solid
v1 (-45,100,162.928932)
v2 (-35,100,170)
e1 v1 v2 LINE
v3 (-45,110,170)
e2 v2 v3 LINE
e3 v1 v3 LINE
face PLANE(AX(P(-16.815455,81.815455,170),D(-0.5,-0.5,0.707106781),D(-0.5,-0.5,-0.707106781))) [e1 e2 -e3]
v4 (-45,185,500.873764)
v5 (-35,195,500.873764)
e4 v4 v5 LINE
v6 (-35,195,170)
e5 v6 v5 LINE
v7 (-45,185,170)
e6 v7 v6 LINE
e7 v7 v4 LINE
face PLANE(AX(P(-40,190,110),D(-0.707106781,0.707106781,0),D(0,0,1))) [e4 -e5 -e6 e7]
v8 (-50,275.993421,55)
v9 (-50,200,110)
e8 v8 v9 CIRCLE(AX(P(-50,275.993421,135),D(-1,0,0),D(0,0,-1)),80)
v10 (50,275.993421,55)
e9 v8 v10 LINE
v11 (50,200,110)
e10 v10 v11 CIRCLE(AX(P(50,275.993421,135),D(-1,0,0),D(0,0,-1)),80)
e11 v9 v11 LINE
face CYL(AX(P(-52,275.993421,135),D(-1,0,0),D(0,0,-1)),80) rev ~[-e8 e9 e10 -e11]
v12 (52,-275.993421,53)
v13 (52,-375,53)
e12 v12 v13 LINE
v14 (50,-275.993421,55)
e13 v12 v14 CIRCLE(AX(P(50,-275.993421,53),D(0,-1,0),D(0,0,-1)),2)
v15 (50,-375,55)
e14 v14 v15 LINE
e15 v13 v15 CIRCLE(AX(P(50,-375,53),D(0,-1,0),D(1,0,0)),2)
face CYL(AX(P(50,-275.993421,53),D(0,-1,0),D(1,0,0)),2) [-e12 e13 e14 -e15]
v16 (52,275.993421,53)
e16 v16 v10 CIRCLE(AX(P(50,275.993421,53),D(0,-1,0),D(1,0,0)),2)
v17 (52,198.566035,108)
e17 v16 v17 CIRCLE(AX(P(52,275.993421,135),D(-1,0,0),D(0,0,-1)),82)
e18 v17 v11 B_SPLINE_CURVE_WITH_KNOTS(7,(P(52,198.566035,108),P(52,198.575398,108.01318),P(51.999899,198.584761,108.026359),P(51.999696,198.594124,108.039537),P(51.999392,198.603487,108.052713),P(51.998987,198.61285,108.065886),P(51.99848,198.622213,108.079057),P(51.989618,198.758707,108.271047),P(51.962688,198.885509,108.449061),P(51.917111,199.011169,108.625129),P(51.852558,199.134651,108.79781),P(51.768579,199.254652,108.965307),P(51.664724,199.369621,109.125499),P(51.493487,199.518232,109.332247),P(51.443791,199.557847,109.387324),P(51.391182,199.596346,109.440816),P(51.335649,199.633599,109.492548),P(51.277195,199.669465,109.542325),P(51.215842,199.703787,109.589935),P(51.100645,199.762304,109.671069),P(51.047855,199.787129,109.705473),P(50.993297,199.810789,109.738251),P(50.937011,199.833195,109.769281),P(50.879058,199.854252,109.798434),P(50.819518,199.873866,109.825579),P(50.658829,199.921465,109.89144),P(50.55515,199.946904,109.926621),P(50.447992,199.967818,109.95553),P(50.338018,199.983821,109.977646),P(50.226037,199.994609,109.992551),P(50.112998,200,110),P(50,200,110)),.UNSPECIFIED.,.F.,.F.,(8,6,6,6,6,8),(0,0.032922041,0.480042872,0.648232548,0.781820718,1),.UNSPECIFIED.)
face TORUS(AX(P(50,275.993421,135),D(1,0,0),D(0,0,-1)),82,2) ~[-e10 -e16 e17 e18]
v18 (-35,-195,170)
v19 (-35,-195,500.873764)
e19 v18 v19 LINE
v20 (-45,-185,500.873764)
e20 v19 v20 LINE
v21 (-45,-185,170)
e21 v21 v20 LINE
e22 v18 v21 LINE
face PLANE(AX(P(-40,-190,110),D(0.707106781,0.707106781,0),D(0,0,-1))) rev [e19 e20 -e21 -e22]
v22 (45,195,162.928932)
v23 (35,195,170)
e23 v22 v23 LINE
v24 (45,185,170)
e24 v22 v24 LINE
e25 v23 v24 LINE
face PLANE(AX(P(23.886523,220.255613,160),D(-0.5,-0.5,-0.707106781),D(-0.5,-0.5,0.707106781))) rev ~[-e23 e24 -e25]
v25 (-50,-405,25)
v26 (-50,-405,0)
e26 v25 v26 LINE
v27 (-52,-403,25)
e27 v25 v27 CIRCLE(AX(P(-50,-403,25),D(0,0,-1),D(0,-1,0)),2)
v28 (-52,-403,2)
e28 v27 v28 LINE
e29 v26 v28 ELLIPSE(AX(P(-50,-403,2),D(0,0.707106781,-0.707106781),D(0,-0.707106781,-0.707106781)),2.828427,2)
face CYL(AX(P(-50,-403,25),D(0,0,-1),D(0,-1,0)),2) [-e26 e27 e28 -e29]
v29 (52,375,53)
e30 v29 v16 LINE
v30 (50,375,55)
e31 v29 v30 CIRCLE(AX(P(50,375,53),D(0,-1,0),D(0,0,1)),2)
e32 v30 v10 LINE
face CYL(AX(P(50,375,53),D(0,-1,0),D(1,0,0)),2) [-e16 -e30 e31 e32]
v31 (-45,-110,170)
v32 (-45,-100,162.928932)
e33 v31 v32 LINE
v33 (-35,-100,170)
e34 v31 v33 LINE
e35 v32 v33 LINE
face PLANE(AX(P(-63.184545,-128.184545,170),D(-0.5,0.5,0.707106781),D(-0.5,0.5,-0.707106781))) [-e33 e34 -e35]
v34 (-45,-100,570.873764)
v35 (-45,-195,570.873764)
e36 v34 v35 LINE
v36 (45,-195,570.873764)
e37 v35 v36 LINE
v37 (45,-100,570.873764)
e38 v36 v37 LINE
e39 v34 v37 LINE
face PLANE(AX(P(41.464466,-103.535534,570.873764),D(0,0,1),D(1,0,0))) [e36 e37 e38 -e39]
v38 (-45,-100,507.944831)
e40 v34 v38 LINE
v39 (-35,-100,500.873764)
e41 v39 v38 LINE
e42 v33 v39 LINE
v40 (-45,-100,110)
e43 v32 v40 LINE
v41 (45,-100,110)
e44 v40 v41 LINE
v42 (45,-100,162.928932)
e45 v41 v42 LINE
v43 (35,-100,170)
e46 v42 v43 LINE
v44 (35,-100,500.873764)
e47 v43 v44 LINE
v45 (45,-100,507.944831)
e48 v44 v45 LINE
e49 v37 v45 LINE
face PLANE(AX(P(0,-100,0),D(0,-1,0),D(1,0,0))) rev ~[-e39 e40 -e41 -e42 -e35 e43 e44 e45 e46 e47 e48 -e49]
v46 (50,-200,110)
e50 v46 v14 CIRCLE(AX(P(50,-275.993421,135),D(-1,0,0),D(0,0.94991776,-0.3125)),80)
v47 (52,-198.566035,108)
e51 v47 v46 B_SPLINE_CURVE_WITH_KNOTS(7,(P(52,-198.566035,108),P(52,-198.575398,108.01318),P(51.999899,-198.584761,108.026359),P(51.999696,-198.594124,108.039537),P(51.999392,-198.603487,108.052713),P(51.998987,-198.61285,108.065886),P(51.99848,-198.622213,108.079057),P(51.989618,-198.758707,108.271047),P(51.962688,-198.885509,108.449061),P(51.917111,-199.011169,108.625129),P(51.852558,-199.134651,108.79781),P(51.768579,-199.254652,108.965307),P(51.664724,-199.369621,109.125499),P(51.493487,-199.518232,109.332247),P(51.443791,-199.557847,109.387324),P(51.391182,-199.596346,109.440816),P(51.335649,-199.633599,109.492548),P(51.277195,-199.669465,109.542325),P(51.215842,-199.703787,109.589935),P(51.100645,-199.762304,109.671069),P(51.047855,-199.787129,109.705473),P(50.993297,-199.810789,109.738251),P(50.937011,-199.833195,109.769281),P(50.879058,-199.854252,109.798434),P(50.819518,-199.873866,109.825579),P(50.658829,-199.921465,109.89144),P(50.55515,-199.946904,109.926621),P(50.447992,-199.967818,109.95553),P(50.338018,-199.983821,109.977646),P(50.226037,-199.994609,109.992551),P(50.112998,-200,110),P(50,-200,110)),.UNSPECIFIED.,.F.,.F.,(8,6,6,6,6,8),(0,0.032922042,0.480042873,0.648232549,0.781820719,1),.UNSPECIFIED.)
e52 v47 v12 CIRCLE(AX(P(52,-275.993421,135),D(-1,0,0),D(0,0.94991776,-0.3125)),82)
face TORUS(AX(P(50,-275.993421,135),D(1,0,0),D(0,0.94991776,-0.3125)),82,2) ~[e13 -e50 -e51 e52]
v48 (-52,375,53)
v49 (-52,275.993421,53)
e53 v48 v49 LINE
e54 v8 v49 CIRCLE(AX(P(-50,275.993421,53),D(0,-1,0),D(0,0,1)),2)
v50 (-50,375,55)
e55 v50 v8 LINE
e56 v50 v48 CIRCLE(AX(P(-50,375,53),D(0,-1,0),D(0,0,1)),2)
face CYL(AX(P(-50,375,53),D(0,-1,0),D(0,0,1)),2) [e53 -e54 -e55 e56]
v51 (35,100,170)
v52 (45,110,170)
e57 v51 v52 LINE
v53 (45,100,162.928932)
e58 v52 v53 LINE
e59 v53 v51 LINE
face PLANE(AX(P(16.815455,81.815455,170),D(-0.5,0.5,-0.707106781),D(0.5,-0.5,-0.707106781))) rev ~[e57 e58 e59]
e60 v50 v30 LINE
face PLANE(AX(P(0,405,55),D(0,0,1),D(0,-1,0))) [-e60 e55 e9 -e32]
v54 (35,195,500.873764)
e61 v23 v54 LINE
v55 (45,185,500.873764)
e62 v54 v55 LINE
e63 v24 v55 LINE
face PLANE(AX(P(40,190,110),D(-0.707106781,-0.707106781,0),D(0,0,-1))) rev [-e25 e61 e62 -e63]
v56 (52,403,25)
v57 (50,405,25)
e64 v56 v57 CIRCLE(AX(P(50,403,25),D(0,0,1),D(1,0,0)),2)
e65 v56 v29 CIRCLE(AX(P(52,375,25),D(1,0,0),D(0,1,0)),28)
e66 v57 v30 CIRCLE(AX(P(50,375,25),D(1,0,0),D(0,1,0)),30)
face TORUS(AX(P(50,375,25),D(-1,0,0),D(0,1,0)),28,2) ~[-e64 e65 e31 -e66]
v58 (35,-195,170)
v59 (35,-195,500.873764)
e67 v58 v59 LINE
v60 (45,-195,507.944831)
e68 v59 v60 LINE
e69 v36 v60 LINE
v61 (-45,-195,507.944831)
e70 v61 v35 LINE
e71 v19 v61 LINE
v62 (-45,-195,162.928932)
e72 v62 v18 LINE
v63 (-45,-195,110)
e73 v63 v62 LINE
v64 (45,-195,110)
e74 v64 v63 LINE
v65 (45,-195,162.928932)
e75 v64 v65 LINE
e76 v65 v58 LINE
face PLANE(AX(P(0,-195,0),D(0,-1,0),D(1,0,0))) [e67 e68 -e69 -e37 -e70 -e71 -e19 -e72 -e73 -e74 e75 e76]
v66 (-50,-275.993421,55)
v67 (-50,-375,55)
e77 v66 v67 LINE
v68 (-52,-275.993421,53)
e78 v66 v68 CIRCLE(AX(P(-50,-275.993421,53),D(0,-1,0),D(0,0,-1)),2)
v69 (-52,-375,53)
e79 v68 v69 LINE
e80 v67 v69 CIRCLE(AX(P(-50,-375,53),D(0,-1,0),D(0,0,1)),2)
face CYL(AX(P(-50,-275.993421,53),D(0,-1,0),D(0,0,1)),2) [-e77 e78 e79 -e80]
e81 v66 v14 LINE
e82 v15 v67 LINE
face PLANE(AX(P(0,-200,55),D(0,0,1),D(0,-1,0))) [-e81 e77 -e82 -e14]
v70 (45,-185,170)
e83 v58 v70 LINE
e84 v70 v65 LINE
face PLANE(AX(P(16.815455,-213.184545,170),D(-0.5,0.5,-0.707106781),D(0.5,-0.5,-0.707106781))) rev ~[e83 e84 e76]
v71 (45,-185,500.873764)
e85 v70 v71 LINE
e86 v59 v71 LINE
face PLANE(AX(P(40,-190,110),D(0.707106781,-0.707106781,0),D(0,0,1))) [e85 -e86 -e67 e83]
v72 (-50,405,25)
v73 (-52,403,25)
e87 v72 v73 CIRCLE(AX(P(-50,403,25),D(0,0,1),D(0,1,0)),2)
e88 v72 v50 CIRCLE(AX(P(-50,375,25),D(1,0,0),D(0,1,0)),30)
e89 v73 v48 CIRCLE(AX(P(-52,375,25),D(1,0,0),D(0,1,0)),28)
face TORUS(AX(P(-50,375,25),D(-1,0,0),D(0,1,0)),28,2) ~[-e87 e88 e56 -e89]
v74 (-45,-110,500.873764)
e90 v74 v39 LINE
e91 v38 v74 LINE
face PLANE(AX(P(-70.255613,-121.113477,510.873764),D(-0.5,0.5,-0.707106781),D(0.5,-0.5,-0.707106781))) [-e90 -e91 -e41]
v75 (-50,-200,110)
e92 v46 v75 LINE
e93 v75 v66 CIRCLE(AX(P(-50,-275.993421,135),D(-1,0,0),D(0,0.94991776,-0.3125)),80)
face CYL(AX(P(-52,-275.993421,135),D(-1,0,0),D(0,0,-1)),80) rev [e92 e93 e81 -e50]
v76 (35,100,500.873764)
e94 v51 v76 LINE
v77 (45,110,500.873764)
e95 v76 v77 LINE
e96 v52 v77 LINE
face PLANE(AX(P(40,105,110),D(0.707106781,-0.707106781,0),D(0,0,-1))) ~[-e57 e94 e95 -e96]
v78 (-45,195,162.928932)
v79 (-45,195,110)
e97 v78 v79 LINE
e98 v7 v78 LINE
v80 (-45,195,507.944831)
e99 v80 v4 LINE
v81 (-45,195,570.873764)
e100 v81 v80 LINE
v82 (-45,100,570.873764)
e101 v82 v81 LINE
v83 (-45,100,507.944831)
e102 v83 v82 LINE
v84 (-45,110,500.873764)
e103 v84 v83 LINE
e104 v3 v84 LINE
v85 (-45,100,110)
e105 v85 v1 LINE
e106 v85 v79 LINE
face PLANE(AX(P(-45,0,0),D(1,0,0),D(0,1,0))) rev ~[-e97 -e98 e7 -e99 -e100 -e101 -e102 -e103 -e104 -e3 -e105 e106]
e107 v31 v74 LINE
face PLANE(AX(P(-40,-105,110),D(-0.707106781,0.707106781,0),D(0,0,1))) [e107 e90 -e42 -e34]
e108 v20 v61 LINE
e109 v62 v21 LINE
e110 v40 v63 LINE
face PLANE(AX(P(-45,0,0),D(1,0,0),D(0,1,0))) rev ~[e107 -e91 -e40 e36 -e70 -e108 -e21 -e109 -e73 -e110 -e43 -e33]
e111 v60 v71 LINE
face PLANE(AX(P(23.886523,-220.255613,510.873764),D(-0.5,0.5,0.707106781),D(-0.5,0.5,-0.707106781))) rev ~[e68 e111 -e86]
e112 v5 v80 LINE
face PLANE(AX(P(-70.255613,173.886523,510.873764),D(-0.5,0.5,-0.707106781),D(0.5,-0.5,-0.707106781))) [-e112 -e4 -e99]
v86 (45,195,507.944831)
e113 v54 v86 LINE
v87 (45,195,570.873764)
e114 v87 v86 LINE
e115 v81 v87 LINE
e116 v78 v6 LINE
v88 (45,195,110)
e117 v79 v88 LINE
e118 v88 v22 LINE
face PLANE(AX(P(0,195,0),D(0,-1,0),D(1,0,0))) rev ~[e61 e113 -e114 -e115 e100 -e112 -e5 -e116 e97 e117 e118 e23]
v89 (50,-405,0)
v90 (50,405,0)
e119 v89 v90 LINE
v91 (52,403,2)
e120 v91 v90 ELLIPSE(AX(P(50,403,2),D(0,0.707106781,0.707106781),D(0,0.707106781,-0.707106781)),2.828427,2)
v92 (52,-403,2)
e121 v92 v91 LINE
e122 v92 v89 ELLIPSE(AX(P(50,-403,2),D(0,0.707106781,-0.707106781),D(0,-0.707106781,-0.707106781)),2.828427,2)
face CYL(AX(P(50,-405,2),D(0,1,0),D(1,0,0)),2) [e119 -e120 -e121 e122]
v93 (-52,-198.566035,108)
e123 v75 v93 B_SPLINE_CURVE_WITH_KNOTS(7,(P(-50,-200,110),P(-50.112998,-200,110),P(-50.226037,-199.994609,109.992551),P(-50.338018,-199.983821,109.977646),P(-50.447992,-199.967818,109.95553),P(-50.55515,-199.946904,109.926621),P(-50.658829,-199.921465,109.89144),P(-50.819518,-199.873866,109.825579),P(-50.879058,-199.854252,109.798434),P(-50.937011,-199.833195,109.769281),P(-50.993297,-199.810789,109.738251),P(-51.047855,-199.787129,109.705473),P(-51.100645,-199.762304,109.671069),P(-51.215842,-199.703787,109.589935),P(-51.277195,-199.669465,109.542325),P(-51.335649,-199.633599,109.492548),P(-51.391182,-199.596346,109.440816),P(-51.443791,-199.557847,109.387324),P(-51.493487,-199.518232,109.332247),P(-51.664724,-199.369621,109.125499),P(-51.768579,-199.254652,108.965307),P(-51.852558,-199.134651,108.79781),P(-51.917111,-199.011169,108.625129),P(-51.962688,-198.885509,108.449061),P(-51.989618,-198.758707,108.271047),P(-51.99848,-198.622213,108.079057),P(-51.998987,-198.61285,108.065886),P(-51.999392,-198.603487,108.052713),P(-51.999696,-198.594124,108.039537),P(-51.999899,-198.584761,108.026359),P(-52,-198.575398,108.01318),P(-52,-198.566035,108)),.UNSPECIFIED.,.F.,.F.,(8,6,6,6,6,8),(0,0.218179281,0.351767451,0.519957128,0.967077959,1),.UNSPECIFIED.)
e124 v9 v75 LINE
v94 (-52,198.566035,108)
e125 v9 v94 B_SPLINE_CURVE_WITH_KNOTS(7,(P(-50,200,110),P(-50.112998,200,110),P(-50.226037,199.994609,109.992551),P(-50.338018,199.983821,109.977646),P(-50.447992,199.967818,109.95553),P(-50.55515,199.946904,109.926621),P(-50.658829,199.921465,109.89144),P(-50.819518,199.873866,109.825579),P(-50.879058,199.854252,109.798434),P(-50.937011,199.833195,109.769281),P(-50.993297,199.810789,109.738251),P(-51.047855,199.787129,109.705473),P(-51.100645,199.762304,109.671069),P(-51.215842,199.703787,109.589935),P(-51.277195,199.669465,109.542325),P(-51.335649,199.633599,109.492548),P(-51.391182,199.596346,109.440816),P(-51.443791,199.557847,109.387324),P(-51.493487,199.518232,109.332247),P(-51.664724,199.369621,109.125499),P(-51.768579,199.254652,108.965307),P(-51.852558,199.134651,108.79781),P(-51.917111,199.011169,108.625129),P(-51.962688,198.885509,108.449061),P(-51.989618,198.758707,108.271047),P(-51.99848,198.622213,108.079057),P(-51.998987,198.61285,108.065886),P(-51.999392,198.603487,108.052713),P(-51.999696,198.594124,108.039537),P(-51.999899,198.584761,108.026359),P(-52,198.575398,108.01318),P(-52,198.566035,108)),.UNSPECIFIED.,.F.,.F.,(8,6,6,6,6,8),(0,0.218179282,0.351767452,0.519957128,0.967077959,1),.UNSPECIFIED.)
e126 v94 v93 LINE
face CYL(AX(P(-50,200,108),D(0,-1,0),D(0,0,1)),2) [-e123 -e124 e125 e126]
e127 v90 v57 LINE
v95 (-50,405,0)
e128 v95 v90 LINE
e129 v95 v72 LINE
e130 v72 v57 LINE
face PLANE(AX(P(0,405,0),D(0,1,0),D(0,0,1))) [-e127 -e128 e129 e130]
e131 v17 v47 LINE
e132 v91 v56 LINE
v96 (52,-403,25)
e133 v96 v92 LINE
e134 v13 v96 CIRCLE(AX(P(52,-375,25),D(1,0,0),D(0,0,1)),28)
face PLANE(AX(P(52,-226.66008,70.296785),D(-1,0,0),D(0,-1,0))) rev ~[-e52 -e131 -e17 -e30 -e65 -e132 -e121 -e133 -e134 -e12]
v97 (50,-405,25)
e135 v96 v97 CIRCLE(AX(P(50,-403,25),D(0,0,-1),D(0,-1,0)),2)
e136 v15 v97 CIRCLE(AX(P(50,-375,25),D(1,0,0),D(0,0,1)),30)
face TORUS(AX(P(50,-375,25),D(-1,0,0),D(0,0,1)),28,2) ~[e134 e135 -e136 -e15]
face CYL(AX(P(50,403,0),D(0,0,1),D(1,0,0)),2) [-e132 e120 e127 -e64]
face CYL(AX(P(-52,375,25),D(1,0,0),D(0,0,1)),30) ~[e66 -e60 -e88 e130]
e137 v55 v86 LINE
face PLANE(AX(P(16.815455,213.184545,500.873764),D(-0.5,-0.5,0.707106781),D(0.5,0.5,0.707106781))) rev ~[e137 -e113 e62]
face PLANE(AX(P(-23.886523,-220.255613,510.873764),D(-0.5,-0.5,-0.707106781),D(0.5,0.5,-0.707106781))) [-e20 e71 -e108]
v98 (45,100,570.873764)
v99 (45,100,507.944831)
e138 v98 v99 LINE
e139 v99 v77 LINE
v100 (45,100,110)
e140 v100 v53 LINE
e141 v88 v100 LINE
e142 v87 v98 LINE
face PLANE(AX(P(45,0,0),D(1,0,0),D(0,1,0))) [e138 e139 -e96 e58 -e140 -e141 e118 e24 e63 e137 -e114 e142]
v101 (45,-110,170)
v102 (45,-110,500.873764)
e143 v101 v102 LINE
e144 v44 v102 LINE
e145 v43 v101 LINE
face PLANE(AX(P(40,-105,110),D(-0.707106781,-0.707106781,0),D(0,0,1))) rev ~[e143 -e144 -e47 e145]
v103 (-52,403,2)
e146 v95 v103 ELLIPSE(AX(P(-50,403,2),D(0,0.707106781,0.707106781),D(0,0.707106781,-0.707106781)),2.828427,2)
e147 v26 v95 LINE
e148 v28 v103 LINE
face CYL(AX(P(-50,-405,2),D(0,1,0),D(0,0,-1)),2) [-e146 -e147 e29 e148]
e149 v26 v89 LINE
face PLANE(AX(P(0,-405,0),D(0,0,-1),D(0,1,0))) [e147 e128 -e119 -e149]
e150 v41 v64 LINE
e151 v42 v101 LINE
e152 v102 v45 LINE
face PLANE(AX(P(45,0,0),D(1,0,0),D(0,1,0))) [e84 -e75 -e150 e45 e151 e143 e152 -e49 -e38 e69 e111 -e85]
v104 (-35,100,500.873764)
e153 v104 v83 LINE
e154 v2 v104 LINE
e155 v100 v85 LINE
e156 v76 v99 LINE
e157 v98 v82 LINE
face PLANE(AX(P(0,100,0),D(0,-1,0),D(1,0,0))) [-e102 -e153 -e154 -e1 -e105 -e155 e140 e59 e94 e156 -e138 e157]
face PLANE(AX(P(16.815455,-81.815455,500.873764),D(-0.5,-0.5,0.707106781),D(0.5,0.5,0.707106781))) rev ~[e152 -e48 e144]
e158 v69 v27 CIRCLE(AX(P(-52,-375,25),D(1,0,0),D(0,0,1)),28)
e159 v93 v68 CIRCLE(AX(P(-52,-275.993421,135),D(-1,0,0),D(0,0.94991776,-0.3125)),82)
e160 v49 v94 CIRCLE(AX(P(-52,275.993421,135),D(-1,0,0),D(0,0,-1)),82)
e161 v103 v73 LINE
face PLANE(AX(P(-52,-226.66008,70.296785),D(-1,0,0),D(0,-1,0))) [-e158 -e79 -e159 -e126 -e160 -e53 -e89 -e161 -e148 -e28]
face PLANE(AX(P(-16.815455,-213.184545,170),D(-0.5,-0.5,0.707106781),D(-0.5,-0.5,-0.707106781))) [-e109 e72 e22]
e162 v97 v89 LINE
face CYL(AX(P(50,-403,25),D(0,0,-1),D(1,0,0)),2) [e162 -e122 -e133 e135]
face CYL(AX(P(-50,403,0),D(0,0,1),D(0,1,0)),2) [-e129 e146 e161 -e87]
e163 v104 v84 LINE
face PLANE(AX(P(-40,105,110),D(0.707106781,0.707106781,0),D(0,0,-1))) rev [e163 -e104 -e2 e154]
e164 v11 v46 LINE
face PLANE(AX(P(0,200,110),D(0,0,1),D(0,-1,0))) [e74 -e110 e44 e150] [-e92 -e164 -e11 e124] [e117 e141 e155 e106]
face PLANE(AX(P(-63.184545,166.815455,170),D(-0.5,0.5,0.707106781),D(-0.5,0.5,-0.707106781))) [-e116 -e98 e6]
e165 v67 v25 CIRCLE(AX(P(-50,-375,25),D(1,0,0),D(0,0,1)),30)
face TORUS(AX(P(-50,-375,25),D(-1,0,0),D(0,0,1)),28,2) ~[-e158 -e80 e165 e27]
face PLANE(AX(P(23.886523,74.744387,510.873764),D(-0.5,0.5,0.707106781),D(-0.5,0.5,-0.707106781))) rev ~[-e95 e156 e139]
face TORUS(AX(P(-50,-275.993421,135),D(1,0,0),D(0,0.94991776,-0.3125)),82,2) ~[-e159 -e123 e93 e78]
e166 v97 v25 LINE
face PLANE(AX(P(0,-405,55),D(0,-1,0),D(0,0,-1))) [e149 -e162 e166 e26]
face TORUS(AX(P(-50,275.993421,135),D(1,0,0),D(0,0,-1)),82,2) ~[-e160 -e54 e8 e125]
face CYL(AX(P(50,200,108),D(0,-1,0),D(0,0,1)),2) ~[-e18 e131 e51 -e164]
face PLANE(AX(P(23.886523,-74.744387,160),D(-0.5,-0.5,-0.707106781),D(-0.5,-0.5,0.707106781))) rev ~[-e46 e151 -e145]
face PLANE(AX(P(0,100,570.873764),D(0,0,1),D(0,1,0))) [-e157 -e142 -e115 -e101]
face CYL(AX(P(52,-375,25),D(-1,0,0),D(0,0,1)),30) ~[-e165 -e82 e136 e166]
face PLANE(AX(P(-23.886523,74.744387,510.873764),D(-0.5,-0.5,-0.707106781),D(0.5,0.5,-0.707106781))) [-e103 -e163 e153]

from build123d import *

# Parameters (mm, degrees)
F1_DEPTH      = 52
F1_DEPTH_BACK = 52
F0_W          = 95
F0_H          = 460.873763546
F2_DEPTH      = 45
F2_DEPTH_BACK = 45
F3_R          = 30
F4_T1_DEPTH   = 104
F5_T1_DEPTH   = 104
F6_SIZE       = 10
F7_W          = 90
F7_H          = 95
F8_DEPTH      = 50
F9_W          = 90
F9_H          = 95
F10_DEPTH     = 60
F11_T4_DEPTH  = 65.575795383
F11_T10_DEPTH = 65.575795383
F11_T16_DEPTH = 65.575795383
F11_T22_DEPTH = 65.575795383
F11_T28_DEPTH = 65.575795383
F11_T34_DEPTH = 65.575795383
F11_T40_DEPTH = 65.575795383
F11_T46_DEPTH = 65.575795383
F12_T4_DEPTH  = 65.575795383
F12_T10_DEPTH = 65.575795383
F12_T16_DEPTH = 65.575795383
F12_T22_DEPTH = 65.575795383
F12_T28_DEPTH = 65.575795383
F12_T34_DEPTH = 65.575795383
F12_T40_DEPTH = 65.575795383
F12_T46_DEPTH = 65.575795383
F13_R         = 2


# Not quite as in the source:
# - a fillet or chamfer that OpenCascade refuses, or shapes differently, is made with other operations: its cross-section is extruded or revolved along the edge and cut away or added


with BuildPart() as f1:
    # F0 (on Right) → F1 (new body, two sides)
    with BuildSketch(Plane.YZ) as f1_sk:
        Polygon((-405, 55), (-405, 0), (405, 0), (405, 55), (200, 55), (200, 110), (195, 110), (100, 110), (0, 110), (-100, 110), (-195, 110), (-200, 110), (-200, 55), align=None)
    extrude(amount=F1_DEPTH)
    extrude(f1_sk.sketch, amount=-F1_DEPTH_BACK)

    # F0 (on Right) → F2 (join, two sides)
    with BuildSketch(Plane.YZ) as f2_sk:
        with Locations((-147.5, 340.436881773)):
            Rectangle(F0_W, F0_H)
        with Locations((147.5, 340.436881773)):
            Rectangle(F0_W, F0_H)
    extrude(amount=-F2_DEPTH)
    extrude(f2_sk.sketch, amount=F2_DEPTH_BACK)

    # F3
    f3_edges = [f1.edges().sort_by_distance(p)[0] for p in [
        (0, 405, 55),
        (0, -405, 55),
    ]]
    fillet(f3_edges, radius=F3_R)

    # F4: fillet of radius 80 on 1 edges, made by hand

    # F4_s2 → F4_t1 (join)
    with BuildSketch(Plane.YZ.offset(-52)):
        with BuildLine():
            ThreePointArc((275.9934207679, 55), (229.0892631696, 70.1925930159), (200, 110))
            Line((200, 110), (200, 55))
            Line((200, 55), (275.9934207679, 55))
        make_face()
    extrude(amount=F4_T1_DEPTH)

    # F5: fillet of radius 80 on 1 edges, made by hand

    # F5_s2 → F5_t1 (join)
    with BuildSketch(Plane.YZ.offset(-52)):
        with BuildLine():
            ThreePointArc((-275.9934207679, 55), (-229.0892631696, 70.1925930159), (-200, 110))
            Line((-200, 110), (-200, 55))
            Line((-200, 55), (-275.9934207679, 55))
        make_face()
    extrude(amount=F5_T1_DEPTH)

    # F6
    f6_edges = [f1.edges().sort_by_distance(p)[0] for p in [
        (45, -195, 340.436882),
        (45, -100, 340.436882),
        (45, 100, 340.436882),
        (-45, -195, 340.436882),
        (-45, -100, 340.436882),
        (-45, 100, 340.436882),
        (-45, 195, 340.436882),
        (45, 195, 340.436882),
    ]]
    chamfer(f6_edges, length=F6_SIZE)

    # F7 (on face) → F8 (join)
    with BuildSketch(Plane.XY.offset(110)):
        with Locations((0, -147.5)):
            Rectangle(F7_W, F7_H)
        with Locations((0, 147.5)):
            Rectangle(F7_W, F7_H)
    extrude(amount=F8_DEPTH)

    # F9 (on face) → F10 (join)
    with BuildSketch(Plane.XY.offset(570.873763546)):
        Polygon((45, -110), (45, -100), (35, -100), align=None)
        Polygon((-45, -110), (-35, -100), (-45, -100), align=None)
        Polygon((45, -195), (45, -185), (35, -195), align=None)
        Polygon((-35, -195), (-45, -185), (-45, -195), align=None)
        with Locations((0, 147.5)):
            Rectangle(F9_W, F9_H)
        Polygon((45, -110), (35, -100), (-35, -100), (-45, -110), (-45, -185), (-35, -195), (35, -195), (45, -185), align=None)
    extrude(amount=-F10_DEPTH)

    # F11: chamfer of 10 on 8 edges, made by hand


with BuildPart() as f11_tool2:
    # F11_s3 → F11_t4 (new body)
    with BuildSketch(Plane(origin=(-98.1845447985, -98.1845447985, 0), x_dir=(0, 0, 1), z_dir=(0.7071067812, 0.7071067812, 0))):
        Polygon((510.873763546, 172.6345596729), (500.873763546, 162.6345596729), (510.873763546, 162.6345596729), align=None)
    extrude(amount=F11_T4_DEPTH)

    split(bisect_by=Plane.YZ.offset(45), keep=Keep.BOTTOM)

    split(bisect_by=Plane.XZ.offset(195), keep=Keep.BOTTOM)


with BuildPart() as f1_1:
    add(f1.part)

    # F11_t1: union F11_tool2
    add(f11_tool2.part)


with BuildPart() as f11_tool8:
    # F11_s9 → F11_t10 (new body)
    with BuildSketch(Plane(origin=(49.3154552015, -49.3154552015, 0), x_dir=(0, 0, 1), z_dir=(0.7071067812, -0.7071067812, 0))):
        Polygon((500.873763546, 45.9619407771), (510.873763546, 35.9619407771), (510.873763546, 45.9619407771), align=None)
    extrude(amount=F11_T10_DEPTH)

    split(bisect_by=Plane.YZ.offset(45), keep=Keep.BOTTOM)

    split(bisect_by=Plane.XZ.offset(100), keep=Keep.TOP)


with BuildPart() as f1_2:
    add(f1_1.part)

    # F11_t7: union F11_tool8
    add(f11_tool8.part)


with BuildPart() as f11_tool14:
    # F11_s15 → F11_t16 (new body)
    with BuildSketch(Plane(origin=(-95.6845447985, -95.6845447985, 0), x_dir=(0, 0, 1), z_dir=(0.7071067812, 0.7071067812, 0))):
        Polygon((510.873763546, 35.9619407771), (500.873763546, 45.9619407771), (510.873763546, 45.9619407771), align=None)
    extrude(amount=F11_T16_DEPTH)

    split(bisect_by=Plane.YZ.offset(-45), keep=Keep.TOP)

    split(bisect_by=Plane.XZ.offset(100), keep=Keep.TOP)


with BuildPart() as f1_3:
    add(f1_2.part)

    # F11_t13: union F11_tool14
    add(f11_tool14.part)


with BuildPart() as f11_tool20:
    # F11_s21 → F11_t22 (new body)
    with BuildSketch(Plane(origin=(98.1845447985, -98.1845447985, 0), x_dir=(0, 0, 1), z_dir=(-0.7071067812, 0.7071067812, 0))):
        Polygon((510.873763546, -172.6345596729), (500.873763546, -162.6345596729), (510.873763546, -162.6345596729), align=None)
    extrude(amount=F11_T22_DEPTH)

    split(bisect_by=Plane.XZ.offset(195), keep=Keep.BOTTOM)

    split(bisect_by=Plane.YZ.offset(-45), keep=Keep.TOP)


with BuildPart() as f1_4:
    add(f1_3.part)

    # F11_t19: union F11_tool20
    add(f11_tool20.part)


with BuildPart() as f11_tool26:
    # F11_s27 → F11_t28 (new body)
    with BuildSketch(Plane(origin=(-98.1845447985, 98.1845447985, 0), x_dir=(0, 0, 1), z_dir=(0.7071067812, -0.7071067812, 0))):
        Polygon((500.873763546, -162.6345596729), (510.873763546, -172.6345596729), (510.873763546, -162.6345596729), align=None)
    extrude(amount=F11_T28_DEPTH)

    split(bisect_by=Plane.YZ.offset(45), keep=Keep.BOTTOM)

    split(bisect_by=Plane.XZ.offset(-195), keep=Keep.TOP)


with BuildPart() as f1_5:
    add(f1_4.part)

    # F11_t25: union F11_tool26
    add(f11_tool26.part)


with BuildPart() as f11_tool32:
    # F11_s33 → F11_t34 (new body)
    with BuildSketch(Plane(origin=(49.3154552015, 49.3154552015, 0), x_dir=(0, 0, 1), z_dir=(0.7071067812, 0.7071067812, 0))):
        Polygon((510.873763546, -35.9619407771), (500.873763546, -45.9619407771), (510.873763546, -45.9619407771), align=None)
    extrude(amount=F11_T34_DEPTH)

    split(bisect_by=Plane.YZ.offset(45), keep=Keep.BOTTOM)

    split(bisect_by=Plane.XZ.offset(-100), keep=Keep.BOTTOM)


with BuildPart() as f1_6:
    add(f1_5.part)

    # F11_t31: union F11_tool32
    add(f11_tool32.part)


with BuildPart() as f11_tool38:
    # F11_s39 → F11_t40 (new body)
    with BuildSketch(Plane(origin=(-49.3154552015, 49.3154552015, 0), x_dir=(0, 0, 1), z_dir=(-0.7071067812, 0.7071067812, 0))):
        Polygon((510.873763546, 35.9619407771), (500.873763546, 45.9619407771), (510.873763546, 45.9619407771), align=None)
    extrude(amount=F11_T40_DEPTH)

    split(bisect_by=Plane.XZ.offset(-100), keep=Keep.BOTTOM)

    split(bisect_by=Plane.YZ.offset(-45), keep=Keep.TOP)


with BuildPart() as f1_7:
    add(f1_6.part)

    # F11_t37: union F11_tool38
    add(f11_tool38.part)


with BuildPart() as f11_tool44:
    # F11_s45 → F11_t46 (new body)
    with BuildSketch(Plane(origin=(51.8154552015, 51.8154552015, 0), x_dir=(0, 0, 1), z_dir=(0.7071067812, 0.7071067812, 0))):
        Polygon((510.873763546, -172.6345596729), (500.873763546, -162.6345596729), (510.873763546, -162.6345596729), align=None)
    extrude(amount=F11_T46_DEPTH)

    split(bisect_by=Plane.YZ.offset(-45), keep=Keep.TOP)

    split(bisect_by=Plane.XZ.offset(-195), keep=Keep.TOP)


with BuildPart() as f1_8:
    add(f1_7.part)

    # F11_t43: union F11_tool44
    add(f11_tool44.part)

    # F12: chamfer of 10 on 8 edges, made by hand


with BuildPart() as f12_tool2:
    # F12_s3 → F12_t4 (new body)
    with BuildSketch(Plane(origin=(51.8154552015, 51.8154552015, 0), x_dir=(0, 0, 1), z_dir=(0.7071067812, 0.7071067812, 0))):
        Polygon((170, -162.6345596729), (160, -172.6345596729), (160, -162.6345596729), align=None)
    extrude(amount=F12_T4_DEPTH)

    split(bisect_by=Plane.YZ.offset(-45), keep=Keep.TOP)

    split(bisect_by=Plane.XZ.offset(-195), keep=Keep.TOP)


with BuildPart() as f1_9:
    add(f1_8.part)

    # F12_t1: union F12_tool2
    add(f12_tool2.part)


with BuildPart() as f12_tool8:
    # F12_s9 → F12_t10 (new body)
    with BuildSketch(Plane(origin=(-98.1845447985, 98.1845447985, 0), x_dir=(0, 0, 1), z_dir=(0.7071067812, -0.7071067812, 0))):
        Polygon((160, -172.6345596729), (170, -162.6345596729), (160, -162.6345596729), align=None)
    extrude(amount=F12_T10_DEPTH)

    split(bisect_by=Plane.YZ.offset(45), keep=Keep.BOTTOM)

    split(bisect_by=Plane.XZ.offset(-195), keep=Keep.TOP)


with BuildPart() as f1_10:
    add(f1_9.part)

    # F12_t7: union F12_tool8
    add(f12_tool8.part)


with BuildPart() as f12_tool14:
    # F12_s15 → F12_t16 (new body)
    with BuildSketch(Plane(origin=(49.3154552015, 49.3154552015, 0), x_dir=(0, 0, 1), z_dir=(0.7071067812, 0.7071067812, 0))):
        Polygon((170, -45.9619407771), (160, -35.9619407771), (160, -45.9619407771), align=None)
    extrude(amount=F12_T16_DEPTH)

    split(bisect_by=Plane.YZ.offset(45), keep=Keep.BOTTOM)

    split(bisect_by=Plane.XZ.offset(-100), keep=Keep.BOTTOM)


with BuildPart() as f1_11:
    add(f1_10.part)

    # F12_t13: union F12_tool14
    add(f12_tool14.part)


with BuildPart() as f12_tool20:
    # F12_s21 → F12_t22 (new body)
    with BuildSketch(Plane(origin=(-98.1845447985, -98.1845447985, 0), x_dir=(0, 0, 1), z_dir=(0.7071067812, 0.7071067812, 0))):
        Polygon((170, 162.6345596729), (160, 172.6345596729), (160, 162.6345596729), align=None)
    extrude(amount=F12_T22_DEPTH)

    split(bisect_by=Plane.YZ.offset(45), keep=Keep.BOTTOM)

    split(bisect_by=Plane.XZ.offset(195), keep=Keep.BOTTOM)


with BuildPart() as f1_12:
    add(f1_11.part)

    # F12_t19: union F12_tool20
    add(f12_tool20.part)


with BuildPart() as f12_tool26:
    # F12_s27 → F12_t28 (new body)
    with BuildSketch(Plane(origin=(49.3154552015, -49.3154552015, 0), x_dir=(0, 0, 1), z_dir=(0.7071067812, -0.7071067812, 0))):
        Polygon((160, 35.9619407771), (170, 45.9619407771), (160, 45.9619407771), align=None)
    extrude(amount=F12_T28_DEPTH)

    split(bisect_by=Plane.YZ.offset(45), keep=Keep.BOTTOM)

    split(bisect_by=Plane.XZ.offset(100), keep=Keep.TOP)


with BuildPart() as f1_13:
    add(f1_12.part)

    # F12_t25: union F12_tool26
    add(f12_tool26.part)


with BuildPart() as f12_tool32:
    # F12_s33 → F12_t34 (new body)
    with BuildSketch(Plane(origin=(-95.6845447985, -95.6845447985, 0), x_dir=(0, 0, 1), z_dir=(0.7071067812, 0.7071067812, 0))):
        Polygon((170, 45.9619407771), (160, 35.9619407771), (160, 45.9619407771), align=None)
    extrude(amount=F12_T34_DEPTH)

    split(bisect_by=Plane.YZ.offset(-45), keep=Keep.TOP)

    split(bisect_by=Plane.XZ.offset(100), keep=Keep.TOP)


with BuildPart() as f1_14:
    add(f1_13.part)

    # F12_t31: union F12_tool32
    add(f12_tool32.part)


with BuildPart() as f12_tool38:
    # F12_s39 → F12_t40 (new body)
    with BuildSketch(Plane(origin=(-49.3154552015, 49.3154552015, 0), x_dir=(0, 0, 1), z_dir=(-0.7071067812, 0.7071067812, 0))):
        Polygon((170, 45.9619407771), (160, 35.9619407771), (160, 45.9619407771), align=None)
    extrude(amount=F12_T40_DEPTH)

    split(bisect_by=Plane.XZ.offset(-100), keep=Keep.BOTTOM)

    split(bisect_by=Plane.YZ.offset(-45), keep=Keep.TOP)


with BuildPart() as f1_15:
    add(f1_14.part)

    # F12_t37: union F12_tool38
    add(f12_tool38.part)


with BuildPart() as f12_tool44:
    # F12_s45 → F12_t46 (new body)
    with BuildSketch(Plane(origin=(98.1845447985, -98.1845447985, 0), x_dir=(0, 0, 1), z_dir=(-0.7071067812, 0.7071067812, 0))):
        Polygon((170, -162.6345596729), (160, -172.6345596729), (160, -162.6345596729), align=None)
    extrude(amount=F12_T46_DEPTH)

    split(bisect_by=Plane.XZ.offset(195), keep=Keep.BOTTOM)

    split(bisect_by=Plane.YZ.offset(-45), keep=Keep.TOP)


with BuildPart() as f1_16:
    add(f1_15.part)

    # F12_t43: union F12_tool44
    add(f12_tool44.part)

    # F13
    f13_edges = [f1_16.edges().sort_by_distance(p)[0] for p in [
        (52, -405, 12.5),
        (52, 0, 0),
        (52, 405, 12.5),
        (52, 396.213203, 46.213203),
        (52, 325.49671, 55),
        (52, 229.089263, 70.192593),
        (52, 0, 110),
        (52, -229.089263, 70.192593),
        (52, -325.49671, 55),
        (52, -396.213203, 46.213203),
        (-52, -405, 12.5),
        (-52, 0, 0),
        (-52, 405, 12.5),
        (-52, 396.213203, 46.213203),
        (-52, 325.49671, 55),
        (-52, 229.089263, 70.192593),
        (-52, 0, 110),
        (-52, -229.089263, 70.192593),
        (-52, -325.49671, 55),
        (-52, -396.213203, 46.213203),
    ]]
    fillet(f13_edges, radius=F13_R)


solid = f1_16.part
